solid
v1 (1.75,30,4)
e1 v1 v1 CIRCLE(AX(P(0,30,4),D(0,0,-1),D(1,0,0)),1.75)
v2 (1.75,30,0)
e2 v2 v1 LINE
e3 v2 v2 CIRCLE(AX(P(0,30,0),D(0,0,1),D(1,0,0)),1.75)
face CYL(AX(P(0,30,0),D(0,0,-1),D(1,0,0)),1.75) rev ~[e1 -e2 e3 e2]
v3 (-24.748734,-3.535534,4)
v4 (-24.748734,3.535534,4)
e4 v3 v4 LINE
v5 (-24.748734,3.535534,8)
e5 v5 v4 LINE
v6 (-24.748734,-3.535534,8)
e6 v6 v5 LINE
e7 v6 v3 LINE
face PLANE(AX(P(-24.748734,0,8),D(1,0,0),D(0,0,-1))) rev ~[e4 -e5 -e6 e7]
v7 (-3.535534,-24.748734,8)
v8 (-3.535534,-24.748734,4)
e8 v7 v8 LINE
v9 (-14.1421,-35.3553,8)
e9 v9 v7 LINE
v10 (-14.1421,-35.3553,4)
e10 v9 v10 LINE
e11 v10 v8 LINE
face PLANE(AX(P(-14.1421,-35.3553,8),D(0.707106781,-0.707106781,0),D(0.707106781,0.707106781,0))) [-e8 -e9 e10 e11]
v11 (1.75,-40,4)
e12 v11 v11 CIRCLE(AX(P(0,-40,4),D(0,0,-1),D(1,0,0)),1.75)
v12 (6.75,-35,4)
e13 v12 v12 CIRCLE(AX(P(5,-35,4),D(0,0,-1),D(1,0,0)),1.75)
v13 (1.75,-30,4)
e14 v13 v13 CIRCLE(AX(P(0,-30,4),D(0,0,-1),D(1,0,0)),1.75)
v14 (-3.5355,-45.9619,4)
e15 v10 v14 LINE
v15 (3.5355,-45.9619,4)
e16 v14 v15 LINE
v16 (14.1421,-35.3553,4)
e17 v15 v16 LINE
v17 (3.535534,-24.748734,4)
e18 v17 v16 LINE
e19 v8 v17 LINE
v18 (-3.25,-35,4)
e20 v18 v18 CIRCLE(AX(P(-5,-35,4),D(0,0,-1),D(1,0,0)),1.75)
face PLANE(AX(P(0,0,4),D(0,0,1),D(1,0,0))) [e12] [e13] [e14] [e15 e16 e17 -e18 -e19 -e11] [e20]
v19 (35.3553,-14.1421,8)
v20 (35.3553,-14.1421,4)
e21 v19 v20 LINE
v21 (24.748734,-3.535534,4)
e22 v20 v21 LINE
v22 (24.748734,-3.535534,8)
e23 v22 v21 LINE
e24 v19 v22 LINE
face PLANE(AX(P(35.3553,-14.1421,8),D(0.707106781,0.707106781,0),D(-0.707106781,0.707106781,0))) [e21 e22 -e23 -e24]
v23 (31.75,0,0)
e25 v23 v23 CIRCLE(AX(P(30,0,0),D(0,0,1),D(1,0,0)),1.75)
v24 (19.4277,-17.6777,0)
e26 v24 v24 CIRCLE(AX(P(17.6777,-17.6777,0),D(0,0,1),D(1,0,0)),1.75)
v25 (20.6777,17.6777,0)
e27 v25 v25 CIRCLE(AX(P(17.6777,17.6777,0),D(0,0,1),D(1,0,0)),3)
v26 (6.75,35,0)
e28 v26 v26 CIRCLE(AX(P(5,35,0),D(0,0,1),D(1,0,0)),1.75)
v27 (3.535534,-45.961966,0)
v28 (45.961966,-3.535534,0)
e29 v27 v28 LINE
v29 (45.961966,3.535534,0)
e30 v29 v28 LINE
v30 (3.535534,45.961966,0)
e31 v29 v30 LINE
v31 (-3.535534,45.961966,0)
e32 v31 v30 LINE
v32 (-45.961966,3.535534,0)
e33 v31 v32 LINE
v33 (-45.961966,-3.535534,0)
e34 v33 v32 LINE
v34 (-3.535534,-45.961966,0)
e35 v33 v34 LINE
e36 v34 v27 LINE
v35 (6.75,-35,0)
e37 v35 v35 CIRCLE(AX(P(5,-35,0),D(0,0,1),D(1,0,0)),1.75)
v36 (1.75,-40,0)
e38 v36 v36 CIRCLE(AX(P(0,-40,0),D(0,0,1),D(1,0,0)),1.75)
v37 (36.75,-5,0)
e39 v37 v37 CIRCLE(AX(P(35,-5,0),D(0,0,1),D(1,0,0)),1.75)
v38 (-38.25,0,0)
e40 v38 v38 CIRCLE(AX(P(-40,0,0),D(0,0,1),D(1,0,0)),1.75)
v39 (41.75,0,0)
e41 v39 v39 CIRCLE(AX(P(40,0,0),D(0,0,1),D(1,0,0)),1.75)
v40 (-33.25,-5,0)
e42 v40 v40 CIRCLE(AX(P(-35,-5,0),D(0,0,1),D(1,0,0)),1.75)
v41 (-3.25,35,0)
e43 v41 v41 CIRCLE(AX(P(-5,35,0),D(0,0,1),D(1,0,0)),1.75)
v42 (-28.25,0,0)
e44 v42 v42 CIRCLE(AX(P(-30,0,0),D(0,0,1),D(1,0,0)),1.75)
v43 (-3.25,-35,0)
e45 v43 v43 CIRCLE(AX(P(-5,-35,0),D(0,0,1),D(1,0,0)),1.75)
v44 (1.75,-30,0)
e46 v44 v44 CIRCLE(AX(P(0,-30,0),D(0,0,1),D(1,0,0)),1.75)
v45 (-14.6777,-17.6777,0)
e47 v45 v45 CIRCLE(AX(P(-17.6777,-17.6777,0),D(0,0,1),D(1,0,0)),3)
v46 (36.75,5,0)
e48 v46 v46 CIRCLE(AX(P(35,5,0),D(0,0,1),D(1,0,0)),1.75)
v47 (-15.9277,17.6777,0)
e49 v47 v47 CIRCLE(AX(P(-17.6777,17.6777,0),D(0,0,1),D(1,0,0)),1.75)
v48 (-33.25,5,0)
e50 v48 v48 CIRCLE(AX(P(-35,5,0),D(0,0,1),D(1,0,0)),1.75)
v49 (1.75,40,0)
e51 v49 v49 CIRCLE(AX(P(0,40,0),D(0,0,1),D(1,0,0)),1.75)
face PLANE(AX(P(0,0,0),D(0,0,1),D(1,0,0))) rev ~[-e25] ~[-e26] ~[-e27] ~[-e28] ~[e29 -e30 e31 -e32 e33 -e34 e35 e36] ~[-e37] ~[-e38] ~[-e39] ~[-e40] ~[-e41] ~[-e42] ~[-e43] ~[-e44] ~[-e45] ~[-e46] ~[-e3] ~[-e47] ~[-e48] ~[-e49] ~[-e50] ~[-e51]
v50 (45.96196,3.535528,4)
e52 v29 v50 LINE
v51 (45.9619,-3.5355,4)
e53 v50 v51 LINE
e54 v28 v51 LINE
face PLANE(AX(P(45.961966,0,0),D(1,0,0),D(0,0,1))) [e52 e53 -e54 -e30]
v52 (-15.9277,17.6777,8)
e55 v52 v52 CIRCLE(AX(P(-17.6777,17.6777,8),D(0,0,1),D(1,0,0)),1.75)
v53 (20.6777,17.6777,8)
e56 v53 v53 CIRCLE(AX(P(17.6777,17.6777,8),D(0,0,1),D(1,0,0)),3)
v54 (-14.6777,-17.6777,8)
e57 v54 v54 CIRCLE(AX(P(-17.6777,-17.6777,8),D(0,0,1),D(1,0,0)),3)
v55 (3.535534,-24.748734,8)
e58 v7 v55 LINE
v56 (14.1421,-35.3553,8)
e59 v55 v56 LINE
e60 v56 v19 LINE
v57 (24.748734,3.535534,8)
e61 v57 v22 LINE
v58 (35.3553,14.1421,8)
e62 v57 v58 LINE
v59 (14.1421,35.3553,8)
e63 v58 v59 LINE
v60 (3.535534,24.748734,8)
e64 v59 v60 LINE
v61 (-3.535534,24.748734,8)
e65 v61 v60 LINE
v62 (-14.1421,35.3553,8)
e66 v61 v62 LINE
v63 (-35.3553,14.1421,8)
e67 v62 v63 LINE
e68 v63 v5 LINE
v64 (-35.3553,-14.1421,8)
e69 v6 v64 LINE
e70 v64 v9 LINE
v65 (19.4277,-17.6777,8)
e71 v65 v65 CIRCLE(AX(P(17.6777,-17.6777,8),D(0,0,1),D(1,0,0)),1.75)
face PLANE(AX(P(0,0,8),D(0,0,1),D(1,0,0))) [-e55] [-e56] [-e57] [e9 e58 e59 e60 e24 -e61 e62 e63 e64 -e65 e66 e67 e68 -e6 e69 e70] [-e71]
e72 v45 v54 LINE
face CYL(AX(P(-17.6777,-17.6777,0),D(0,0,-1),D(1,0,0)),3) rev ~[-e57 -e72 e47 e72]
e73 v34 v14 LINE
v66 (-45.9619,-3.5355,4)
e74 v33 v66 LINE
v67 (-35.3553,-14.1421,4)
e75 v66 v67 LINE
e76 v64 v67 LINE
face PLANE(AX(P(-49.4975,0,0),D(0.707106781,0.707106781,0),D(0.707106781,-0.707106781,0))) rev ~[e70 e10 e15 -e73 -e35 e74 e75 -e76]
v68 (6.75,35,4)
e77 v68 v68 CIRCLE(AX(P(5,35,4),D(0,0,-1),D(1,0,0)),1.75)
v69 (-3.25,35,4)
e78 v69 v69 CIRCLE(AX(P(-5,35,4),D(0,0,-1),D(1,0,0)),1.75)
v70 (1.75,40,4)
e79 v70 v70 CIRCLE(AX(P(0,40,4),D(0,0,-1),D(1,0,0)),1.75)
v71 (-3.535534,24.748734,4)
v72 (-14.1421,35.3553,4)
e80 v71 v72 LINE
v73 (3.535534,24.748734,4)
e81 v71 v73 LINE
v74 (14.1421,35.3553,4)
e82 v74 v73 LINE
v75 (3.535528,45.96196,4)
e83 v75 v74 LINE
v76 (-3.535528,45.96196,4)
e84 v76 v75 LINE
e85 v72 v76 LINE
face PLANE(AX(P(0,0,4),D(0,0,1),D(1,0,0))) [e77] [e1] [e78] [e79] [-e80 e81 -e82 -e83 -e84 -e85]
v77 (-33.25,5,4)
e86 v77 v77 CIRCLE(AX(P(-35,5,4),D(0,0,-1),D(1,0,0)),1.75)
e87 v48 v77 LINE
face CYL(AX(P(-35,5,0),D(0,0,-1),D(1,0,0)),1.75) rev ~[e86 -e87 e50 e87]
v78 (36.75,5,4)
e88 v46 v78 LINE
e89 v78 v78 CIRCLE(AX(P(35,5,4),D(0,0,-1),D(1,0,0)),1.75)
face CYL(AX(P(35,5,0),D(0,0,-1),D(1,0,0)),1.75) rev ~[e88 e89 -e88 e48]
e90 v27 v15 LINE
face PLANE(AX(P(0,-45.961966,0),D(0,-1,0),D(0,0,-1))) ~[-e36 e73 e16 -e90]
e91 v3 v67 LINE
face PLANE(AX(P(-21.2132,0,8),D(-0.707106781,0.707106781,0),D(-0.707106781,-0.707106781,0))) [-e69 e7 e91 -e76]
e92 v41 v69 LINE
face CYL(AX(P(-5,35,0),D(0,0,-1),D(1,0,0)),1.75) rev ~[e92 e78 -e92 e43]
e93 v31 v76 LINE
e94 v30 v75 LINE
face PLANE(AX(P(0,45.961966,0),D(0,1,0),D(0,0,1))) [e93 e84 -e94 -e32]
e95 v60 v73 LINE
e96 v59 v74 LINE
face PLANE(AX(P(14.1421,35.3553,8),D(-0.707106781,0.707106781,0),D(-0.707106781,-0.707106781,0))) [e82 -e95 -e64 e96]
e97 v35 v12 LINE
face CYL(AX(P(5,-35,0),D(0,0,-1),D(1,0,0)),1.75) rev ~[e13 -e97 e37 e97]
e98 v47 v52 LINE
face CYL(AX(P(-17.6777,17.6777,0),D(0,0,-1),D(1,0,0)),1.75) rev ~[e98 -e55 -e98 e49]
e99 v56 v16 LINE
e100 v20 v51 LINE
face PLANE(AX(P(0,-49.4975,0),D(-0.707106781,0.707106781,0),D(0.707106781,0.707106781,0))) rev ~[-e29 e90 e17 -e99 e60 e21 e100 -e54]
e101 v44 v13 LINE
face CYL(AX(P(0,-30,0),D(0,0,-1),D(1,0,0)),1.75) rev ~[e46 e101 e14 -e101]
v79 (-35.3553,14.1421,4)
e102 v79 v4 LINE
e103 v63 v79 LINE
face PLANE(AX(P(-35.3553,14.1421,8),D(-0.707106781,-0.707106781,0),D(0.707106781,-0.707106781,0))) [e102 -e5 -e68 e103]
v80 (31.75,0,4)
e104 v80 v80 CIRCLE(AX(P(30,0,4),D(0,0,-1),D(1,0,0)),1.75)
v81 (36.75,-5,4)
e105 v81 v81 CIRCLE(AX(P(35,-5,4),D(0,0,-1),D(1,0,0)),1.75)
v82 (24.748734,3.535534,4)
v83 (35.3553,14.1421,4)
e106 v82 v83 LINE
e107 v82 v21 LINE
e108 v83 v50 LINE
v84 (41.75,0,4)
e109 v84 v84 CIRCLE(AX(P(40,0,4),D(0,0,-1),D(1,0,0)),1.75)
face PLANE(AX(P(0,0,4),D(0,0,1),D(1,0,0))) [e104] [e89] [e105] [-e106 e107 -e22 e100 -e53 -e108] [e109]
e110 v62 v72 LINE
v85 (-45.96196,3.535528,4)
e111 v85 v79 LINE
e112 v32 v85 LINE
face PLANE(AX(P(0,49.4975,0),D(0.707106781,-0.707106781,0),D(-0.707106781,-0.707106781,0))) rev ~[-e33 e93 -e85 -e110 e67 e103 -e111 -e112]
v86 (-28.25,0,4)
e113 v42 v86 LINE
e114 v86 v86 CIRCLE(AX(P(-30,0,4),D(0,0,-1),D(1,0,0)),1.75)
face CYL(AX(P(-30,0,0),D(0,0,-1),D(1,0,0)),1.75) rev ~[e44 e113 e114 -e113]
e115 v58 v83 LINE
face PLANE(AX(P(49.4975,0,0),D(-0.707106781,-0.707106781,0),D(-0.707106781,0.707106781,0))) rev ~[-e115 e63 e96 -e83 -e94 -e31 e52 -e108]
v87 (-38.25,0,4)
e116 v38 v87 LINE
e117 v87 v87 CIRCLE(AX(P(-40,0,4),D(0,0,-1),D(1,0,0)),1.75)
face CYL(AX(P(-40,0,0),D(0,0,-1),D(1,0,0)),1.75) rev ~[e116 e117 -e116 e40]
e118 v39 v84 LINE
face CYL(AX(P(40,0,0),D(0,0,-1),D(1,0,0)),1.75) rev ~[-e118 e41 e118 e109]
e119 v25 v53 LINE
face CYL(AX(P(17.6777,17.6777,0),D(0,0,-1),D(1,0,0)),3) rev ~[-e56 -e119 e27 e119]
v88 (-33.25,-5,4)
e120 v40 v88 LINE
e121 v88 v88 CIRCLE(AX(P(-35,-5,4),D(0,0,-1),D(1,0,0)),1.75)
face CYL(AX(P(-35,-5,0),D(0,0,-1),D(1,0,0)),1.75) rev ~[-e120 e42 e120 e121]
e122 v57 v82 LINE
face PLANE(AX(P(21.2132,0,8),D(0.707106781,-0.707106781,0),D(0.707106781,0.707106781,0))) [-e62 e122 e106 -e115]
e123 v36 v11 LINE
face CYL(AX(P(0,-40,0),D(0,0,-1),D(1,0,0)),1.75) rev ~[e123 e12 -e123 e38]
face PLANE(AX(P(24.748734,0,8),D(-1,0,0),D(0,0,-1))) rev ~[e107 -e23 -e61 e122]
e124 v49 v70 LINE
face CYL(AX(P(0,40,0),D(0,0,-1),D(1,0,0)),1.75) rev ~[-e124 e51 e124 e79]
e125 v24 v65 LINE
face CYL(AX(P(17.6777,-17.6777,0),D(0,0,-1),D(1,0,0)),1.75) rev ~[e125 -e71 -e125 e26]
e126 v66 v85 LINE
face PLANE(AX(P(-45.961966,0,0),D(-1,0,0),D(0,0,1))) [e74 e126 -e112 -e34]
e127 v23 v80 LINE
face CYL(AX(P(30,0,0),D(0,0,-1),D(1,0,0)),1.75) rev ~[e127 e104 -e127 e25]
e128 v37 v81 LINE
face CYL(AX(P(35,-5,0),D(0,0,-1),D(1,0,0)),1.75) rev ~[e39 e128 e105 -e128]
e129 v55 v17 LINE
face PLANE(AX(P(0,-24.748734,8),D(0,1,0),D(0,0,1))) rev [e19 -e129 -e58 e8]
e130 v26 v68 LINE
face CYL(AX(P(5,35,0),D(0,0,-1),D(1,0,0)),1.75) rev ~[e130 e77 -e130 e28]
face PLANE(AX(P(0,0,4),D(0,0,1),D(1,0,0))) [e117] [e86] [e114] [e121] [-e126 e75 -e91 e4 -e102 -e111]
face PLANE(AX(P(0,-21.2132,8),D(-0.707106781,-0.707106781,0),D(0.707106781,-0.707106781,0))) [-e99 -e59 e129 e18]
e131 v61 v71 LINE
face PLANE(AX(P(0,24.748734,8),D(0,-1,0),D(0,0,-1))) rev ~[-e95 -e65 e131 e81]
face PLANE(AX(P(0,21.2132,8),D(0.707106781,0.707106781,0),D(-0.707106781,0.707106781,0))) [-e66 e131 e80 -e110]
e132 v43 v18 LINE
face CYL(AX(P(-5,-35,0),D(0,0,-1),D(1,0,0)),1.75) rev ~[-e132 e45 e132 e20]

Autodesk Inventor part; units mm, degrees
ref_plane "YZ Plane" through (0, 0, 0) normal (1, 0, 0) x (0, 1, 0)
ref_plane "XZ Plane" through (0, 0, 0) normal (0, 1, 0) x (-1, 0, 0)
ref_plane "XY Plane" through (0, 0, 0) normal (0, 0, 1) x (1, 0, 0)
sketch "スケッチ2" plane through (0, 0, 0) normal (0, 0, 1) x (1, 0, 0)
  line L0 (0, -49.4975) -> (49.4975, 0)
  line L1 (49.4975, 0) -> (0, 49.4975)
  line L2 (0, 49.4975) -> (-49.4975, 0)
  line L3 (-49.4975, 0) -> (0, -49.4975)
  line L4 (0, -49.4975) -> (0, 49.4975) construction
  line L5 (49.4975, 0) -> (-49.4975, 0) construction
  circle A0 centre (-5, 35) radius 1.75
  circle A1 centre (5, 35) radius 1.75
  circle A2 centre (-35, -5) radius 1.75
  circle A3 centre (-35, 5) radius 1.75
  circle A4 centre (5, -35) radius 1.75
  circle A5 centre (-5, -35) radius 1.75
  circle A6 centre (35, 5) radius 1.75
  circle A7 centre (35, -5) radius 1.75
  line L6 (-24.7487, 24.7487) -> (24.7487, -24.7487) construction
  line L7 (24.7487, 24.7487) -> (-24.7487, -24.7487) construction
  circle A8 centre (17.6777, 17.6777) radius 3
  circle A9 centre (-17.6777, 17.6777) radius 1.75
  circle A10 centre (-17.6777, -17.6777) radius 3
  circle A11 centre (17.6777, -17.6777) radius 1.75
  circle A12 centre (-30, 0) radius 1.75
  circle A13 centre (-40, 0) radius 1.75
  line L8 (-35, -5) -> (-35, 5) construction
  circle A14 centre (0, -30) radius 1.75
  circle A15 centre (0, -40) radius 1.75
  circle A16 centre (30, 0) radius 1.75
  circle A17 centre (40, 0) radius 1.75
  circle A18 centre (0, 30) radius 1.75
  circle A19 centre (0, 40) radius 1.75
  point P0 (0, 0)
  dimension "d1" = 3.5
  dimension "d2" = 5
  dimension "d3" = 35
  dimension "d6" = 360
  dimension "d12" = 6
  dimension "d13" = 3.5
  dimension "d14" = 25
  dimension "d15" = 25
  dimension "d29" = 70
  dimension "d30" = 5
  dimension "d31" = 5
  dimension "d34" = 360
extrude "押し出し1" add sketch "スケッチ2" along normal blind 8
chamfer "面取り1" distance 5 angle 45 4 edges at (0, -49.4975, 4) (49.4975, 0, 4) (0, 49.4975, 4) (-49.4975, 0, 4)
sketch "スケッチ4" plane through (0, 0, 8) normal (0, 0, 1) x (1, 0, 0)
  line L0 (3.5355, -45.9619) -> (45.9619, -3.5355) projected
  line L1 (-45.9619, -3.5355) -> (-3.5355, -45.9619) projected
  line L2 (0, -21.2132) -> (14.1421, -35.3553)
  line L3 (14.1421, -35.3553) -> (0, -49.4975)
  line L4 (0, -49.4975) -> (-14.1421, -35.3553)
  line L5 (-14.1421, -35.3553) -> (0, -21.2132)
  line L6 (21.2132, 0) -> (35.3553, 14.1421)
  line L7 (35.3553, 14.1421) -> (49.4975, 0)
  line L8 (49.4975, 0) -> (35.3553, -14.1421)
  line L9 (35.3553, -14.1421) -> (21.2132, 0)
  line L10 (0, 21.2132) -> (-14.1421, 35.3553)
  line L11 (-14.1421, 35.3553) -> (0, 49.4975)
  line L12 (0, 49.4975) -> (14.1421, 35.3553)
  line L13 (14.1421, 35.3553) -> (0, 21.2132)
  line L14 (-21.2132, 0) -> (-35.3553, -14.1421)
  line L15 (-35.3553, -14.1421) -> (-49.4975, 0)
  line L16 (-49.4975, 0) -> (-35.3553, 14.1421)
  line L17 (-35.3553, 14.1421) -> (-21.2132, 0)
  point P0 (0, 0)
  point P1 (45.9619, 3.5355)
  point P2 (45.9619, -3.5355)
  point P3 (-3.5355, 45.9619)
  point P4 (3.5355, 45.9619)
  point P5 (-45.9619, -3.5355)
  point P6 (-45.9619, 3.5355)
  dimension "d36" = 20
  dimension "d37" = 20
  dimension "d40" = 360
extrude "押し出し3" cut sketch "スケッチ4" against normal blind 4
chamfer "面取り2" distance 5 angle 45 4 edges at (21.2132, 0, 6) (0, -21.2132, 6) (-21.2132, 0, 6) (0, 21.2132, 6)
properties part number "ワイヤジンバル1"
